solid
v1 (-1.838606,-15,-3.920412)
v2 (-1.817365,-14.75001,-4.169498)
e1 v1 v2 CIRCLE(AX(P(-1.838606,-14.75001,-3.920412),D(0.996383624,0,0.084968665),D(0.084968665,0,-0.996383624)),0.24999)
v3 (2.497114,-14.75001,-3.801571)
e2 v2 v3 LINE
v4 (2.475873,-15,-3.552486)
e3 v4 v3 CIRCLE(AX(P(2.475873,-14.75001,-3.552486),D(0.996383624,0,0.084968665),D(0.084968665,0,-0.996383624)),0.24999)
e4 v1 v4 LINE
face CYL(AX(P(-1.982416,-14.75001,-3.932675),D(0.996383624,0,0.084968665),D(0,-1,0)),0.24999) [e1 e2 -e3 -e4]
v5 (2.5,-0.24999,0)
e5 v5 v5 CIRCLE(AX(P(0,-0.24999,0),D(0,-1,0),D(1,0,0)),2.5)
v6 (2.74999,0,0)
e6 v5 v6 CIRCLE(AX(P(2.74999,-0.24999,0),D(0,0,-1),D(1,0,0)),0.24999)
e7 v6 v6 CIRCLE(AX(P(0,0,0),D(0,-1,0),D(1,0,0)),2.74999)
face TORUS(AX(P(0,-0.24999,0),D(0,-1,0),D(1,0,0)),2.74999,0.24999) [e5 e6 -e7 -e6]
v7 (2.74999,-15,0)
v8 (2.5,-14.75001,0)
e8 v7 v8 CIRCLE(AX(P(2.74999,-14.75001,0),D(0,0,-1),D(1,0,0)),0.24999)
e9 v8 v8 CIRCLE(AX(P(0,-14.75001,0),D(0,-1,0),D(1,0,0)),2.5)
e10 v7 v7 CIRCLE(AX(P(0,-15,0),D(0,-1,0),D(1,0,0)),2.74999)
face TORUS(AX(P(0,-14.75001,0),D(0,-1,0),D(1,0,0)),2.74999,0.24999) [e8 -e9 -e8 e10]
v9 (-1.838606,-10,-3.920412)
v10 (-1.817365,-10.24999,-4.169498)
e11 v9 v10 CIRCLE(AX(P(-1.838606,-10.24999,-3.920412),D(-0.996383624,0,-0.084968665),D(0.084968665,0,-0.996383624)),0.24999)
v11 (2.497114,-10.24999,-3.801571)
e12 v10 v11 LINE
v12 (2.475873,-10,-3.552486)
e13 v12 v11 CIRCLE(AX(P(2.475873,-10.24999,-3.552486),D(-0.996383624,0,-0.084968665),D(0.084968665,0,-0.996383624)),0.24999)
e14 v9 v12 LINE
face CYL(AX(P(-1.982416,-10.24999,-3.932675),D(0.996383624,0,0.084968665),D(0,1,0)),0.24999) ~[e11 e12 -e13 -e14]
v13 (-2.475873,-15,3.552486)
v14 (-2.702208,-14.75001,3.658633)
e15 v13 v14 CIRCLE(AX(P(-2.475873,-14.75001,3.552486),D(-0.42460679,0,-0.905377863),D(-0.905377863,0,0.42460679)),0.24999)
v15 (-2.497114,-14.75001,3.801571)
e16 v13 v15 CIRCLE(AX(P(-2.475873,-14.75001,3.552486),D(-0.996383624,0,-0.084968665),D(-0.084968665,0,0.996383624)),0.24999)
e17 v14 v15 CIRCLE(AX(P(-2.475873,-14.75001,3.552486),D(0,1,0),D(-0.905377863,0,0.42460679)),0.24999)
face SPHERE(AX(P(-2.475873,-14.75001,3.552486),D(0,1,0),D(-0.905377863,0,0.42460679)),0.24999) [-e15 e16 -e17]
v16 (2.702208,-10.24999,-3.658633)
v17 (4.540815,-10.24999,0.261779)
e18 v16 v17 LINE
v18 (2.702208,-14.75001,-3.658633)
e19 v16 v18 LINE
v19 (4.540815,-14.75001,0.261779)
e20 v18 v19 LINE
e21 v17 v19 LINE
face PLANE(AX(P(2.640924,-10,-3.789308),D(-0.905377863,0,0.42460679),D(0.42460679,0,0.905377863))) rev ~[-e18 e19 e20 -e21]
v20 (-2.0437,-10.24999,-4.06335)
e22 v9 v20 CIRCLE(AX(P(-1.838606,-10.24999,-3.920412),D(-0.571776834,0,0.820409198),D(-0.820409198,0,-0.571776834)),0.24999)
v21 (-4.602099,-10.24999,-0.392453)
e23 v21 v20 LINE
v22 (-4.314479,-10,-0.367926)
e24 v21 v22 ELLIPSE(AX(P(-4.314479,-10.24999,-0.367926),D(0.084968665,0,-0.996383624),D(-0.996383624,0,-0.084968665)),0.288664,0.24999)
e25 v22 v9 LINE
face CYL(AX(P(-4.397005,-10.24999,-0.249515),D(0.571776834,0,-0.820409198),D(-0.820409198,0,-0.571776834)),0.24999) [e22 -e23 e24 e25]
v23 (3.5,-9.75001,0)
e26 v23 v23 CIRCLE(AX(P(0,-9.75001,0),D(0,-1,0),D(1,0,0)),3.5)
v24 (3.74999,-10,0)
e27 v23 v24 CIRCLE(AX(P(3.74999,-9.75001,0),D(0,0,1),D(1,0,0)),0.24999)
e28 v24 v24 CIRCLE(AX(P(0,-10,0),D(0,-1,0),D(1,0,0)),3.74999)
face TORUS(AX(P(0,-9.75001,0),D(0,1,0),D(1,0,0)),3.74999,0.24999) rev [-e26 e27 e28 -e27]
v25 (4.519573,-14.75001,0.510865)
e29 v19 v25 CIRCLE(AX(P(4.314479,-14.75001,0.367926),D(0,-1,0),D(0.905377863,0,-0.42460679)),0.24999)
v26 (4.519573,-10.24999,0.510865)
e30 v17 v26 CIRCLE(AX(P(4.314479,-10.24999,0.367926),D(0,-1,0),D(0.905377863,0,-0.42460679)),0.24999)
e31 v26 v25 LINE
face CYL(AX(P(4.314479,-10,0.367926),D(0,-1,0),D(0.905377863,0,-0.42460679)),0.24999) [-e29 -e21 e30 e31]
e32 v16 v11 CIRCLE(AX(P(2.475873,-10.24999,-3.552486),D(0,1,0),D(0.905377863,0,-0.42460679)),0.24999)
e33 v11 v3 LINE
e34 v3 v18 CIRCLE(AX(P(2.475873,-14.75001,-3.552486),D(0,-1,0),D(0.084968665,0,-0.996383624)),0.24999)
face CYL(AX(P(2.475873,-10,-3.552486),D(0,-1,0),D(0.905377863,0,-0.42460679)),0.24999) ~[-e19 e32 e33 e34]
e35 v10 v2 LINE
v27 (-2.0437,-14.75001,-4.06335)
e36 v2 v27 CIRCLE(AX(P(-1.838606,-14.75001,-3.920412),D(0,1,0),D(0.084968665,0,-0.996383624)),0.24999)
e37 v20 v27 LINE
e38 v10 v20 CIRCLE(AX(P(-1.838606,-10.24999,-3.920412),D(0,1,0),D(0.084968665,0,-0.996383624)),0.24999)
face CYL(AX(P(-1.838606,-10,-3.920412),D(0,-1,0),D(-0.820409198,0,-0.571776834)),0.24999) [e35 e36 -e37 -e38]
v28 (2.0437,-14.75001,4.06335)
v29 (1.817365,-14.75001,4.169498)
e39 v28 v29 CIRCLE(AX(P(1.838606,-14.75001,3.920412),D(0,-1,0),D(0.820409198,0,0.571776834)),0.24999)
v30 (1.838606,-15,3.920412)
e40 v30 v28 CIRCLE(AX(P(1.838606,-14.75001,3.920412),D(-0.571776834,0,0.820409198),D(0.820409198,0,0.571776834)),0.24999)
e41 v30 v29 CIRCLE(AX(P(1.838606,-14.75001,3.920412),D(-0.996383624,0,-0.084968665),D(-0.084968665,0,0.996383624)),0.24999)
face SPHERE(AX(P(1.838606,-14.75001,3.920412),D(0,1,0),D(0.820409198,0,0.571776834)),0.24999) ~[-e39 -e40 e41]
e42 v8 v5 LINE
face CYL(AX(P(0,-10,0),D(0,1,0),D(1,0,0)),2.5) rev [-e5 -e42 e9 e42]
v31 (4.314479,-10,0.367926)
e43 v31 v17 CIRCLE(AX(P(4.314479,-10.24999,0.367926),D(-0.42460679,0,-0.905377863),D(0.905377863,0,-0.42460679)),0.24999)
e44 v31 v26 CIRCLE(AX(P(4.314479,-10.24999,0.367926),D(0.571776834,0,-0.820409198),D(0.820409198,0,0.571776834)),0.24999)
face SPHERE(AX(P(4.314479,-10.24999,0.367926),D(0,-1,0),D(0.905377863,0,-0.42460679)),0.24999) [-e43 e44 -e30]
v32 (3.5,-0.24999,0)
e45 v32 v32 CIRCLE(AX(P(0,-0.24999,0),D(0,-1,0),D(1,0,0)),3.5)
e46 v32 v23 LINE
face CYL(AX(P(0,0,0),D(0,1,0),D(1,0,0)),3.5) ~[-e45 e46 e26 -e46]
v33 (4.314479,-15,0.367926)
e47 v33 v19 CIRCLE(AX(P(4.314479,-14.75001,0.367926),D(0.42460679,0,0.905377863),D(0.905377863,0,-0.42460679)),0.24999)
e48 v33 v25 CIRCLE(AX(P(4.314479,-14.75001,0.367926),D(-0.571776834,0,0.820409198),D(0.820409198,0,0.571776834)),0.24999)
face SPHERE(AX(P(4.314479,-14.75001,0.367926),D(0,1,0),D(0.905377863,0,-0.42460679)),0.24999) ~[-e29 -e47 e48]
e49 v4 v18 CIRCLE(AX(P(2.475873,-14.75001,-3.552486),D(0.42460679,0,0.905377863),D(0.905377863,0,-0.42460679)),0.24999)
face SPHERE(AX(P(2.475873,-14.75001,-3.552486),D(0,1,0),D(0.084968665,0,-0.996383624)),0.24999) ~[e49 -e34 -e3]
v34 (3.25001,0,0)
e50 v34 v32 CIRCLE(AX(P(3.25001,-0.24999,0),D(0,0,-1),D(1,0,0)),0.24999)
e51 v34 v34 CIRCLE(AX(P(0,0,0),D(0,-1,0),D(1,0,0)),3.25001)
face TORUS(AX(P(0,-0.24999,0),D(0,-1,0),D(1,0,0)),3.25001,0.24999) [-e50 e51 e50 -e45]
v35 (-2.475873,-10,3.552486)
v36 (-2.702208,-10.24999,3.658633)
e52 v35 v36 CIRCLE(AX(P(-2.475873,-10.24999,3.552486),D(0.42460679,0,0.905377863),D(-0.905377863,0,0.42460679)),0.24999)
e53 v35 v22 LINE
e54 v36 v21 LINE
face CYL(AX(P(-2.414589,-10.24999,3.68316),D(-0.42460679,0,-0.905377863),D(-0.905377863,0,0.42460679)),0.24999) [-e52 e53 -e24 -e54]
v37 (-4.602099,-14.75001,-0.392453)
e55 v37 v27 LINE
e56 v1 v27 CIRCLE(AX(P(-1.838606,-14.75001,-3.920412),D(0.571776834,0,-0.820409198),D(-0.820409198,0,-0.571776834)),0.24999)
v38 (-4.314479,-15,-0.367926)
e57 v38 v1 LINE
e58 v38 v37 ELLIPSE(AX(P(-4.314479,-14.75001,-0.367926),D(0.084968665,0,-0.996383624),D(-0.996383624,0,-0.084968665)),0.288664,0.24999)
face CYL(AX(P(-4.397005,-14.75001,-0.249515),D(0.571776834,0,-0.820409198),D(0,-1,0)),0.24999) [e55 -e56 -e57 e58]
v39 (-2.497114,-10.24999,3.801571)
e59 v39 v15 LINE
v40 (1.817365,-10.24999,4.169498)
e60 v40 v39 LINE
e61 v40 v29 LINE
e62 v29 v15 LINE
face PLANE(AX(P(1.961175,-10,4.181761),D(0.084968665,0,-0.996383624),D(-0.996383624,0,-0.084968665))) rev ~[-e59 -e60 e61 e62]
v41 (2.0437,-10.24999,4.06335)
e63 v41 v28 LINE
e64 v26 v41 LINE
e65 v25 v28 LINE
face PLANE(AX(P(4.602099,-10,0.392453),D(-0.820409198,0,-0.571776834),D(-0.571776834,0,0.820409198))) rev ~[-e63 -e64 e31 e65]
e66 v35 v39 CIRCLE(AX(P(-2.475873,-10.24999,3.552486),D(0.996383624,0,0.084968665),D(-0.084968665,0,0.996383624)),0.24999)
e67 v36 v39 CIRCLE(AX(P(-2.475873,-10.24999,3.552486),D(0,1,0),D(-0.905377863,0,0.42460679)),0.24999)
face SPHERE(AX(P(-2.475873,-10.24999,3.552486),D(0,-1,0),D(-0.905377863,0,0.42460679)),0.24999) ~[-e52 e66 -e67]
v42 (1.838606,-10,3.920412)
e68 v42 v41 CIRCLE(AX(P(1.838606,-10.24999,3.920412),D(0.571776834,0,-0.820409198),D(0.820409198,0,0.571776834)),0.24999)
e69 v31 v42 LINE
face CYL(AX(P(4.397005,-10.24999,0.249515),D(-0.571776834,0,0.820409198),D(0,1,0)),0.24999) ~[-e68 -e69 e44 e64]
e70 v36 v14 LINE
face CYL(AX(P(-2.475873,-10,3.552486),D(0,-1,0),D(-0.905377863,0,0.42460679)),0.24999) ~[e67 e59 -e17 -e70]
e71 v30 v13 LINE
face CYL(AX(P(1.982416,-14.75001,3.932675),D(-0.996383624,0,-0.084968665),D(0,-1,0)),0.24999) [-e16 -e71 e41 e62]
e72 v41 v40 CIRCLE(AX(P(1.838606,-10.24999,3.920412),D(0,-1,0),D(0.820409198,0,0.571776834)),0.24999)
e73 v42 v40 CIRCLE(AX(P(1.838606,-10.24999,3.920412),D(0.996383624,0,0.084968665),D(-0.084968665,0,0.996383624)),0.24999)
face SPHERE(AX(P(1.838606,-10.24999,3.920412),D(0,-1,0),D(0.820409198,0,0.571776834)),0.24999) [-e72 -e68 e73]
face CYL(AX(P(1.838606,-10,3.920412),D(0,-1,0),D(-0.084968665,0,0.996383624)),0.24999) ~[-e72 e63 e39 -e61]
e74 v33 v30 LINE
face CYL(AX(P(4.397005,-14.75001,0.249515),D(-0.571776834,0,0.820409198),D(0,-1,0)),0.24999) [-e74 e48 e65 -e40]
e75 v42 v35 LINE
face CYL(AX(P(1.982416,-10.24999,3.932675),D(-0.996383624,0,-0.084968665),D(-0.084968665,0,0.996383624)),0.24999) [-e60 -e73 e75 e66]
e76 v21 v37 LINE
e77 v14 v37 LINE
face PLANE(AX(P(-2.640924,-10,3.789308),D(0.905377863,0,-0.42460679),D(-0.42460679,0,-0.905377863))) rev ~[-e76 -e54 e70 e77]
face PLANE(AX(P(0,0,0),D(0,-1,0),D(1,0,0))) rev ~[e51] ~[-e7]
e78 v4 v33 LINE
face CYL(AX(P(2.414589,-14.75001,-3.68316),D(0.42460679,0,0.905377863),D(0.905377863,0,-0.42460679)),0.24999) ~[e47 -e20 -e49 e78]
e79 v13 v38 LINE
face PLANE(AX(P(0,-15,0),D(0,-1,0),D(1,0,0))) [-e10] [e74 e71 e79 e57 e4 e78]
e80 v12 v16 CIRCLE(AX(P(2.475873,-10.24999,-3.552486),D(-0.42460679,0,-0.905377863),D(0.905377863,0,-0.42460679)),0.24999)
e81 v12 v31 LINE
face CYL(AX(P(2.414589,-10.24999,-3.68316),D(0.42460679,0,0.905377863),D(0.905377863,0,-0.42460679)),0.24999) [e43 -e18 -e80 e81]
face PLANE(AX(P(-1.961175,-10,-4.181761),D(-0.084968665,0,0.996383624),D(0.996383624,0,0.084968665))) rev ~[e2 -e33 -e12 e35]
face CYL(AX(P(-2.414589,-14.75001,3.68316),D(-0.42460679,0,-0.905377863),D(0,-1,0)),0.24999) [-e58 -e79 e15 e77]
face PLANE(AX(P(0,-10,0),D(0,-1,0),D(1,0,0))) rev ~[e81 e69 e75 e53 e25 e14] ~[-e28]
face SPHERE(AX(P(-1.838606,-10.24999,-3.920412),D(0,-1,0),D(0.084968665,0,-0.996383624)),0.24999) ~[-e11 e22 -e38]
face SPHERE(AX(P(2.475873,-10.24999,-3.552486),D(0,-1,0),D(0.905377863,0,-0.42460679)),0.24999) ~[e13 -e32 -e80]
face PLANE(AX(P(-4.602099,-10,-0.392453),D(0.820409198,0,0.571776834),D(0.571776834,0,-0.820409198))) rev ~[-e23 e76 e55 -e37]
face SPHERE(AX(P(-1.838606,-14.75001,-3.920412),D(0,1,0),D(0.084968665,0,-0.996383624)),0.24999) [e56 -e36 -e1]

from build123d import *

# Parameters (mm, degrees)
F0_R     = 3.5
F0_R_2   = 2.5
F1_DEPTH = 10
F2_START = 10
F2_DEPTH = 5
F3_R     = 0.24999


# Not quite as in the source:
# - a fillet or chamfer is up to 0.001 mm smaller than in the source, because OpenCascade refuses the exact size


with BuildPart() as f1:
    # F0 (on Front) → F1 (new body)
    with BuildSketch(Plane.XZ):
        Circle(F0_R)
        Circle(F0_R_2, mode=Mode.SUBTRACT)
    extrude(amount=F1_DEPTH)

    # F0 (on Front) → F2 (join)
    with BuildSketch(Plane.XZ.offset(F2_START)):
        Polygon((2.6409240726, -3.78930777), (4.6020988279, 0.3924534514), (1.9611747553, 4.1817612214), (-2.6409240726, 3.78930777), (-4.6020988279, -0.3924534514), (-1.9611747553, -4.1817612214), align=None)
        Circle(F0_R, mode=Mode.SUBTRACT)
        Circle(F0_R)
        Circle(F0_R_2, mode=Mode.SUBTRACT)
    extrude(amount=F2_DEPTH)

    # F3 (radius 0.25 in the source; OpenCascade refuses exactly that, so slightly less here)
    f3_edges = [f1.edges().sort_by_distance(p)[0] for p in [
        (-2.5, -15, 0),
        (-0.339875, -15, 3.985534),
        (-0.339875, -10, 3.985534),
        (1.961175, -12.5, 4.181761),
        (-3.5, 0, 0),
        (-2.640924, -12.5, 3.789308),
        (-3.621511, -15, 1.698427),
        (-3.281637, -15, -2.287107),
        (-3.621511, -10, 1.698427),
        (-3.281637, -10, -2.287107),
        (-1.961175, -12.5, -4.181761),
        (0.339875, -10, -3.985534),
        (2.640924, -12.5, -3.789308),
        (0.339875, -15, -3.985534),
        (3.621511, -15, -1.698427),
        (3.281637, -15, 2.287107),
        (4.602099, -12.5, 0.392453),
        (3.621511, -10, -1.698427),
        (3.281637, -10, 2.287107),
        (-3.5, -10, 0),
        (-2.5, 0, 0),
    ]]
    fillet(f3_edges, radius=F3_R)


solid = f1.part
